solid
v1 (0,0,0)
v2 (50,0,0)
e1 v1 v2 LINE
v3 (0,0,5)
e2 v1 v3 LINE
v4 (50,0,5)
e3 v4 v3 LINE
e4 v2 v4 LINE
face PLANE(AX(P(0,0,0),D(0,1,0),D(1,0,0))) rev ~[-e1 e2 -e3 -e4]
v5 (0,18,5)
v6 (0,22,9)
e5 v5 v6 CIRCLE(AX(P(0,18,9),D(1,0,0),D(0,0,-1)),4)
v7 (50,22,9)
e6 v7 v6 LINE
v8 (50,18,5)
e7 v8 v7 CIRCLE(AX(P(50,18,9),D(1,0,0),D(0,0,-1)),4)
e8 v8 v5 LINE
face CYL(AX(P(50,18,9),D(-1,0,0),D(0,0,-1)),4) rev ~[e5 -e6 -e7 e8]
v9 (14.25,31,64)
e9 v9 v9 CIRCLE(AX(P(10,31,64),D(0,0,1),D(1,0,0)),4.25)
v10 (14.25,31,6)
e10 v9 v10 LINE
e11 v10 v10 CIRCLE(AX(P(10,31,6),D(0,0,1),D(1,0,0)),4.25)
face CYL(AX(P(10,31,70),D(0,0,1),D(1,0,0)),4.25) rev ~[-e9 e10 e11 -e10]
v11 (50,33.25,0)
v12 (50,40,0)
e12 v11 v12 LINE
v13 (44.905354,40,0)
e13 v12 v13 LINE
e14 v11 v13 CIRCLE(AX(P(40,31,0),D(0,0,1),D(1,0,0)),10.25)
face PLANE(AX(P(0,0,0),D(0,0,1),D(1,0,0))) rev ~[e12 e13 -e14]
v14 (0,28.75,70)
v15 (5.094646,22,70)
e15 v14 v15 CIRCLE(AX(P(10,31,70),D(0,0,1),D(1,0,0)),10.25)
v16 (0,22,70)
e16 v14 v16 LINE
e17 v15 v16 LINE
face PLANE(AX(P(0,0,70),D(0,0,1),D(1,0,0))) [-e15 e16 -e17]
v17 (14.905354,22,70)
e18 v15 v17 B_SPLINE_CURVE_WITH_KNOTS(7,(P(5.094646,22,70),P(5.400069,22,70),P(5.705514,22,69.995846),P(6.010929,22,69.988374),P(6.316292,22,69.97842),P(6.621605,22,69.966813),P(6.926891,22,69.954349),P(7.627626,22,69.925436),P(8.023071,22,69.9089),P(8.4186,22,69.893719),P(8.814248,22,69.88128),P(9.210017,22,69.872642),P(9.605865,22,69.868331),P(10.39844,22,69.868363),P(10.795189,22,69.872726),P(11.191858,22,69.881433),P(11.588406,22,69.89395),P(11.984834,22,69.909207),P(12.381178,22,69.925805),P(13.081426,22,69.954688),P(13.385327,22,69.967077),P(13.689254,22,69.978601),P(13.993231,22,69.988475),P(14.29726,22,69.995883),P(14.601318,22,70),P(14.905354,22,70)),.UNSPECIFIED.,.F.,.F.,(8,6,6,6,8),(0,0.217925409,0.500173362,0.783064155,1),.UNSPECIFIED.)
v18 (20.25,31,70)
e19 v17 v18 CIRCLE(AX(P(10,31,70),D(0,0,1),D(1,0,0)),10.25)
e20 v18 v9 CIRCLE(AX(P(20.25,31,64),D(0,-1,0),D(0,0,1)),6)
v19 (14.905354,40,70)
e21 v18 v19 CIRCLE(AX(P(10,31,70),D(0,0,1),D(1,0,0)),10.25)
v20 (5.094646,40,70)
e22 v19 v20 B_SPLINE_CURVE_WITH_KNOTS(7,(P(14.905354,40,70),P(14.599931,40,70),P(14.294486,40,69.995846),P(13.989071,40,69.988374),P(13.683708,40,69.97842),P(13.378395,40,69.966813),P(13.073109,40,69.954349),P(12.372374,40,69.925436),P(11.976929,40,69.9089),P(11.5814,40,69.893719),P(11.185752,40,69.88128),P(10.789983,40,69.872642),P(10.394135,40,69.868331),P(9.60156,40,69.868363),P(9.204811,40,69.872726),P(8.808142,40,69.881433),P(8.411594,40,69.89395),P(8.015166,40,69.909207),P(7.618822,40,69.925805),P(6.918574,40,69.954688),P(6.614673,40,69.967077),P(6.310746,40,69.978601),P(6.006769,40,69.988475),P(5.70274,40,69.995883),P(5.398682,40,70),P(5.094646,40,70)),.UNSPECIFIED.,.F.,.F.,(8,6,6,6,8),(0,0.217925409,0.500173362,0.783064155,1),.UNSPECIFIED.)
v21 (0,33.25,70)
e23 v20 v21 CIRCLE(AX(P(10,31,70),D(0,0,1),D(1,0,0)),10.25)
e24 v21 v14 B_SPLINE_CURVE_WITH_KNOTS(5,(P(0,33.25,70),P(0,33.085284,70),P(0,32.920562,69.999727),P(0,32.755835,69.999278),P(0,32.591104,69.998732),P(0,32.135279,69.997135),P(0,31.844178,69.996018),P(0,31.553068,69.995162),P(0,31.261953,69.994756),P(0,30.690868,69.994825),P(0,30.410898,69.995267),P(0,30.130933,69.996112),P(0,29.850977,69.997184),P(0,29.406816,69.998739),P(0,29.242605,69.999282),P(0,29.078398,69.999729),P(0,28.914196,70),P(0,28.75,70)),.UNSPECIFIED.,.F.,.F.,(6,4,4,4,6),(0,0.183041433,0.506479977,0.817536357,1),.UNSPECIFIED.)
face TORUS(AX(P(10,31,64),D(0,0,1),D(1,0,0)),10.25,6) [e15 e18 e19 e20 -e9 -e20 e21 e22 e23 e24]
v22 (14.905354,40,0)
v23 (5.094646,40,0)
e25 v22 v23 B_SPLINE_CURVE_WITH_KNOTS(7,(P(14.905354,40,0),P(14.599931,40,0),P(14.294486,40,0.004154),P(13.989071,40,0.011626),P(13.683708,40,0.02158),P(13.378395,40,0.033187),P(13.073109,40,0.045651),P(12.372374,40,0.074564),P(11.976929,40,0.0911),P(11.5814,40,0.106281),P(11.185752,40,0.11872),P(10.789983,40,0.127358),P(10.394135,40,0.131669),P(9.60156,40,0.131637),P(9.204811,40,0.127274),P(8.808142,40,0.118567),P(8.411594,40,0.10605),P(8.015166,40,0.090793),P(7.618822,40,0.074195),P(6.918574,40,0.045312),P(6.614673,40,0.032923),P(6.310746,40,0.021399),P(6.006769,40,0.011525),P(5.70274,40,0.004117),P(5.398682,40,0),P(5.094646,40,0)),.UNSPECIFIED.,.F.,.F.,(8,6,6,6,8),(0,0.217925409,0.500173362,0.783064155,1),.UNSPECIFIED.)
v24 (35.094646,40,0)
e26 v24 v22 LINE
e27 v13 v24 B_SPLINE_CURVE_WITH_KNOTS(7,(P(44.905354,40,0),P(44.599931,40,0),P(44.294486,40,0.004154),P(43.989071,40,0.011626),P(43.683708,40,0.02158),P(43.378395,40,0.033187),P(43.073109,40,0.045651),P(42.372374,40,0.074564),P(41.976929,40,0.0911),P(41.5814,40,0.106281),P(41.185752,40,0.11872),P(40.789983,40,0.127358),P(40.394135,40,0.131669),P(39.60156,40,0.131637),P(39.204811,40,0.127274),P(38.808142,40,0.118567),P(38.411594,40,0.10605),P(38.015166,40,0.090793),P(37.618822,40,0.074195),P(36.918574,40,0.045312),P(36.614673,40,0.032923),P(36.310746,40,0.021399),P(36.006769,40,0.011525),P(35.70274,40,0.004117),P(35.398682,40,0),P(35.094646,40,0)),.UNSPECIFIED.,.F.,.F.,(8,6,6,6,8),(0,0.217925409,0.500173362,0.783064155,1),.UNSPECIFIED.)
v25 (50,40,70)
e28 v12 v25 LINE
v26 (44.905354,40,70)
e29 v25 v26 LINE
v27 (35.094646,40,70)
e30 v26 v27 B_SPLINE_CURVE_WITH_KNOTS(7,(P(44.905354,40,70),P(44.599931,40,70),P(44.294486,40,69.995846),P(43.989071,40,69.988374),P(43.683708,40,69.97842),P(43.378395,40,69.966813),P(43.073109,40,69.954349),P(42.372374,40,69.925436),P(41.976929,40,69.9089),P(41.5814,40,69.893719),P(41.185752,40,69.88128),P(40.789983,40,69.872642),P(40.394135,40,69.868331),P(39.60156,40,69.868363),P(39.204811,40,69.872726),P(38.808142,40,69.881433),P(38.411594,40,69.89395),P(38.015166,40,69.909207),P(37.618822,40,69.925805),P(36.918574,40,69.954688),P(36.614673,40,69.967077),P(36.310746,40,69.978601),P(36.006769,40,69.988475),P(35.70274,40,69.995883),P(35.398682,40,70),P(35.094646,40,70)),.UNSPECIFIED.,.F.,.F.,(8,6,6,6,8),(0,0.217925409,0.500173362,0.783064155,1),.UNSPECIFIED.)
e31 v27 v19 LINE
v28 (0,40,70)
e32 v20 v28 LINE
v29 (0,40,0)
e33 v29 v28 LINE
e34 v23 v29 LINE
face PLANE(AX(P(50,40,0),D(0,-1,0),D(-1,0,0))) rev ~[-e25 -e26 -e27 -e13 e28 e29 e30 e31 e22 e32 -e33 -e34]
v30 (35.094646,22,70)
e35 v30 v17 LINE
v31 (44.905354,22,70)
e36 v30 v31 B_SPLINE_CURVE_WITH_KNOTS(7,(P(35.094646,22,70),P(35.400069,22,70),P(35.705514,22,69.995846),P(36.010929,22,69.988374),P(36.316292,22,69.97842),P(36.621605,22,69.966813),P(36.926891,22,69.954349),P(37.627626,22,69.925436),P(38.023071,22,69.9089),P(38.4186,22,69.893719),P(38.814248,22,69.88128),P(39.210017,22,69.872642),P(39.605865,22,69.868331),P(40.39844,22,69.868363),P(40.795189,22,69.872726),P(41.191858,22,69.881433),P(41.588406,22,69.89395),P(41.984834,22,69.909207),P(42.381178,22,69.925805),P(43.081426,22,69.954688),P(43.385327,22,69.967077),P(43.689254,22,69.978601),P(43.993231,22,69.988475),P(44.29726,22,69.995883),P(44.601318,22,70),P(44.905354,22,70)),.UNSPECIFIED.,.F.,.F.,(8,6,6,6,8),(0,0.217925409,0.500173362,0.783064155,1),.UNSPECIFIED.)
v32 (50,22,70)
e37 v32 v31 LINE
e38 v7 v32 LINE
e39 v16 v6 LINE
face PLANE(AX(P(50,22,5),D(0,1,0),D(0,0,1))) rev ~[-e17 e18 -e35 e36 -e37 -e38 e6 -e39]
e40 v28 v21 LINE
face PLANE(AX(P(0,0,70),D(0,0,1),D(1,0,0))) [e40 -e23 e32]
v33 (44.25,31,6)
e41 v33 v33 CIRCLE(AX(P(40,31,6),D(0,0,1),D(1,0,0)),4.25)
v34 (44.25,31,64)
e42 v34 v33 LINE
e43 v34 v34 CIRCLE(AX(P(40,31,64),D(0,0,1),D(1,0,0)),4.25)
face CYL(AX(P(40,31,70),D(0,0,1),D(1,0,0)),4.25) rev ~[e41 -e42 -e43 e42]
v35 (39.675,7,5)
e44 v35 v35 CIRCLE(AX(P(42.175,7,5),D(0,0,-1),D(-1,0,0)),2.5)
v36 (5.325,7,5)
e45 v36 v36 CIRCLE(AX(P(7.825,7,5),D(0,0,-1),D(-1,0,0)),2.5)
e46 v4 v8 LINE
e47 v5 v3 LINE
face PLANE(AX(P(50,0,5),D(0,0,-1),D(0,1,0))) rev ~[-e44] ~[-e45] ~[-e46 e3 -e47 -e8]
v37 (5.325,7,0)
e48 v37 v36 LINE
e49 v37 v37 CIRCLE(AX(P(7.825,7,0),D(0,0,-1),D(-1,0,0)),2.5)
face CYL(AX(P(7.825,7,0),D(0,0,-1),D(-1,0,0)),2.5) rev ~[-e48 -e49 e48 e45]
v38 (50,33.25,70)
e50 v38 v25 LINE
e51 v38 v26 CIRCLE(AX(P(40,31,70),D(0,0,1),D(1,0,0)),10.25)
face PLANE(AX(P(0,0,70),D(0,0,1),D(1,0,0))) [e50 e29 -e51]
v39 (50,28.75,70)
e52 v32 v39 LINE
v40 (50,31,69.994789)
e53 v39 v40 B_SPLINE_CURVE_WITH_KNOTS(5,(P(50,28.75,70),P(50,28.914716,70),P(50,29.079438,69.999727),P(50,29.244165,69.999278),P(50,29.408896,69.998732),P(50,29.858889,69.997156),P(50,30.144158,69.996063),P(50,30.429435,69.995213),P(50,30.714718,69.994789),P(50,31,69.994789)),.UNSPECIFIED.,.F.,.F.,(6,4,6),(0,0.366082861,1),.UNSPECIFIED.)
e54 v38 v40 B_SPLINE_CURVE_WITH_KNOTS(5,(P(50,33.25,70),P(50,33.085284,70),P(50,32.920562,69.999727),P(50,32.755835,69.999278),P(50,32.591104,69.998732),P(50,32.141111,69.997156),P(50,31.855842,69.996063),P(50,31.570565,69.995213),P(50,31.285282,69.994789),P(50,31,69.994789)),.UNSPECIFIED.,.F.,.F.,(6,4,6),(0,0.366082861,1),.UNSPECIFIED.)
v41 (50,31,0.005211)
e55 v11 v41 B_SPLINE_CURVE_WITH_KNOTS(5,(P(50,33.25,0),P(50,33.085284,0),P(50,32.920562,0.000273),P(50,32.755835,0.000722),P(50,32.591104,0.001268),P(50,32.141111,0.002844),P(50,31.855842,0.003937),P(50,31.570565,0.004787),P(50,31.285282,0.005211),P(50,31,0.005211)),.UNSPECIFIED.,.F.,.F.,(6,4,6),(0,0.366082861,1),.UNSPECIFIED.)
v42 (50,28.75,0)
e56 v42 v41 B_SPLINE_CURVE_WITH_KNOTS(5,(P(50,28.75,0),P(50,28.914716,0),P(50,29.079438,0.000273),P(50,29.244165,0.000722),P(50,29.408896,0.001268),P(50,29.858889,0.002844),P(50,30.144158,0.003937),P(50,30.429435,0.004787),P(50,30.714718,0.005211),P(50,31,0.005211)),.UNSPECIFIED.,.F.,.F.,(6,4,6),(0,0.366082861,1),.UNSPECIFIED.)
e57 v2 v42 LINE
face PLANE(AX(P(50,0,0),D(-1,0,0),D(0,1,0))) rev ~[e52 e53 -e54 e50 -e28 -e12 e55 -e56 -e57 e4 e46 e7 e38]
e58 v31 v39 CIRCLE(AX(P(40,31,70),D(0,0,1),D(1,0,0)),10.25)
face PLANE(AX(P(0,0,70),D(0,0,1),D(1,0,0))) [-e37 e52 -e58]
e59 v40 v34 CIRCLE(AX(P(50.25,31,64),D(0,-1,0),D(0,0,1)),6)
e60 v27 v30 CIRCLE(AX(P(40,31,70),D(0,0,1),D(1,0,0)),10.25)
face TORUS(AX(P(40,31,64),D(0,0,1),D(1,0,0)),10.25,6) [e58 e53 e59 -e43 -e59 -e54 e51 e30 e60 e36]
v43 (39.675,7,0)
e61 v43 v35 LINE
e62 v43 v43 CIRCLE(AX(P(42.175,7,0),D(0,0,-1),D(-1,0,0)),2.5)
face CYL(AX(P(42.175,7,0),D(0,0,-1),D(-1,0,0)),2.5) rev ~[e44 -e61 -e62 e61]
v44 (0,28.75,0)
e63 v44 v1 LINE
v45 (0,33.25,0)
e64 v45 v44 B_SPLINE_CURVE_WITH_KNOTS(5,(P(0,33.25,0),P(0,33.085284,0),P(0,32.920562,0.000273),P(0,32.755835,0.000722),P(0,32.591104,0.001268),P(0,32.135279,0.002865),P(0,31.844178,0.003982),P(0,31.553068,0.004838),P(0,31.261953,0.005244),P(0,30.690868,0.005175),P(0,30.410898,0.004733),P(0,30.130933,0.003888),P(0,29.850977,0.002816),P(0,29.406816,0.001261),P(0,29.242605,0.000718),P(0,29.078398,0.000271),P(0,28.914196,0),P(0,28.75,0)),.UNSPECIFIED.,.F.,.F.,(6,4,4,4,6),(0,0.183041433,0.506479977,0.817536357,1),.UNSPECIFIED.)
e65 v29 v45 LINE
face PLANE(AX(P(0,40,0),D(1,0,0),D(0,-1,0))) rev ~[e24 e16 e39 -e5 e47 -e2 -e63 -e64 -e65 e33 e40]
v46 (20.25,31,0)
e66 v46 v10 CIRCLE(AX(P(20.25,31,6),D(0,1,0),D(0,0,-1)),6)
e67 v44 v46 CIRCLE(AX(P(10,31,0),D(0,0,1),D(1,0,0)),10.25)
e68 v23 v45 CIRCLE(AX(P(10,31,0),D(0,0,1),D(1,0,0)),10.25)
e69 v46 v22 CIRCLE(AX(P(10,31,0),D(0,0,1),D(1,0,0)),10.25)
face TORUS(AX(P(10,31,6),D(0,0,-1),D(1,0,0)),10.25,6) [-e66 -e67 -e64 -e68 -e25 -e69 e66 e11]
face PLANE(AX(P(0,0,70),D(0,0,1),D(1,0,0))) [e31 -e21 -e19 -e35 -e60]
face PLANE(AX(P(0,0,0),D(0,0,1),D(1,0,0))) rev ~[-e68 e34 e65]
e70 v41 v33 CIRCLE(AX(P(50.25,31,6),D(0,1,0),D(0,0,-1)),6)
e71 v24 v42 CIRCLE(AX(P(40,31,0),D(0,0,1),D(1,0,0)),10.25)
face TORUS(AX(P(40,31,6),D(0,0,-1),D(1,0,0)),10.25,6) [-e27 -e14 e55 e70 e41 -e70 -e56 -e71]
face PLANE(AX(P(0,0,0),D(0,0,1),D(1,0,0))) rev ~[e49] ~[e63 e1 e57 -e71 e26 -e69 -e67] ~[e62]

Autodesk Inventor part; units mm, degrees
ref_plane "YZ Plane" through (0, 0, 0) normal (1, 0, 0) x (0, 1, 0)
ref_plane "XZ Plane" through (0, 0, 0) normal (0, 1, 0) x (-1, 0, 0)
ref_plane "XY Plane" through (0, 0, 0) normal (0, 0, 1) x (1, 0, 0)
sketch "Sketch1" plane through (0, 0, 0) normal (0, 0, 1) x (1, 0, 0)
  line L0 (0, 0) -> (50, 0)
  line L1 (50, 0) -> (50, 40)
  line L2 (50, 40) -> (0, 40)
  line L3 (0, 40) -> (0, 0)
  dimension "d0" = 50
  dimension "d1" = 40
extrude "Extrusion1" add sketch "Sketch1" along normal blind 70
sketch "Sketch2" plane through (50, 0, 0) normal (1, 0, 0) x (0, 0, -1)
  line L0 (0, 0) -> (0, 40) projected
  line L1 (0, 40) -> (-70, 40) projected
  line L2 (-70, 0) -> (-70, 40) projected
  line L3 (0, 0) -> (-70, 0) projected
  line L4 (-70, 0) -> (-5, 0)
  line L5 (-5, 0) -> (-5, 22)
  line L6 (-5, 22) -> (-70, 22)
  line L7 (-70, 22) -> (-70, 0)
  point P0 (0, 0)
  dimension "d5" = 5
  dimension "d6" = 18
extrude "Extrusion2" cut sketch "Sketch2" against normal up to next contours L3 L2 L6 L5
sketch "Sketch3" plane through (0, 0, 70) normal (0, 0, 1) x (1, 0, 0)
  line L0 (0, 22) -> (50, 22) projected
  line L1 (50, 22) -> (50, 40) projected
  line L2 (50, 40) -> (0, 40) projected
  line L3 (0, 40) -> (0, 22) projected
  circle A0 centre (10, 31) radius 4.25
  circle A1 centre (40, 31) radius 4.25
  point P0 (0, 0)
  dimension "d9" = 8.5
  dimension "d10" = 8.5
  dimension "d11" = 30
  dimension "d12" = 50
  dimension "d13" = 10
  dimension "d14" = 18
  dimension "d15" = 9
  dimension "d16" = 9
extrude "Extrusion3" cut sketch "Sketch3" against normal up to next contours A0 | A1
fillet "Fillet1" radius 4 1 edges at (25, 22, 5)
sketch "Sketch4" plane through (0, 0, 0) normal (0, 0, -1) x (-1, 0, 0)
  circle A0 centre (-10, 31) radius 4.25 projected
  circle A1 centre (-40, 31) radius 4.25 projected
  line L0 (0, 0) -> (-50, 0) projected
  line L1 (0, 40) -> (0, 0) projected
  line L2 (-50, 40) -> (0, 40) projected
  line L3 (-50, 0) -> (-50, 40) projected
  circle A2 centre (-42.175, 7) radius 2.5
  circle A3 centre (-7.825, 7) radius 2.5
  dimension "d20" = 50
  dimension "d21" = 5
  dimension "d22" = 5
  dimension "d23" = 34.35
  dimension "d24" = 7.825
  dimension "d25" = 7
  dimension "d26" = 7
extrude "Extrusion4" cut sketch "Sketch4" against normal up to next contours A2 | A3
fillet "Fillet2" radius 6 4 edges at (35.75, 31, 0) (5.75, 31, 0) (35.75, 31, 70) (5.75, 31, 70)
equation "\"d9\" = d10"
equation "\"d13\" = -0.5 * d11 + 0.5 * d12"
equation "\"d15\" = 0.5 * d14"
equation "\"d16\" = d15"
equation "\"d24\" = -0.5 * d23 + 0.5 * d20"
equation "\"d26\" = d25"
properties part number "tubing_alignment_arm[3]"
